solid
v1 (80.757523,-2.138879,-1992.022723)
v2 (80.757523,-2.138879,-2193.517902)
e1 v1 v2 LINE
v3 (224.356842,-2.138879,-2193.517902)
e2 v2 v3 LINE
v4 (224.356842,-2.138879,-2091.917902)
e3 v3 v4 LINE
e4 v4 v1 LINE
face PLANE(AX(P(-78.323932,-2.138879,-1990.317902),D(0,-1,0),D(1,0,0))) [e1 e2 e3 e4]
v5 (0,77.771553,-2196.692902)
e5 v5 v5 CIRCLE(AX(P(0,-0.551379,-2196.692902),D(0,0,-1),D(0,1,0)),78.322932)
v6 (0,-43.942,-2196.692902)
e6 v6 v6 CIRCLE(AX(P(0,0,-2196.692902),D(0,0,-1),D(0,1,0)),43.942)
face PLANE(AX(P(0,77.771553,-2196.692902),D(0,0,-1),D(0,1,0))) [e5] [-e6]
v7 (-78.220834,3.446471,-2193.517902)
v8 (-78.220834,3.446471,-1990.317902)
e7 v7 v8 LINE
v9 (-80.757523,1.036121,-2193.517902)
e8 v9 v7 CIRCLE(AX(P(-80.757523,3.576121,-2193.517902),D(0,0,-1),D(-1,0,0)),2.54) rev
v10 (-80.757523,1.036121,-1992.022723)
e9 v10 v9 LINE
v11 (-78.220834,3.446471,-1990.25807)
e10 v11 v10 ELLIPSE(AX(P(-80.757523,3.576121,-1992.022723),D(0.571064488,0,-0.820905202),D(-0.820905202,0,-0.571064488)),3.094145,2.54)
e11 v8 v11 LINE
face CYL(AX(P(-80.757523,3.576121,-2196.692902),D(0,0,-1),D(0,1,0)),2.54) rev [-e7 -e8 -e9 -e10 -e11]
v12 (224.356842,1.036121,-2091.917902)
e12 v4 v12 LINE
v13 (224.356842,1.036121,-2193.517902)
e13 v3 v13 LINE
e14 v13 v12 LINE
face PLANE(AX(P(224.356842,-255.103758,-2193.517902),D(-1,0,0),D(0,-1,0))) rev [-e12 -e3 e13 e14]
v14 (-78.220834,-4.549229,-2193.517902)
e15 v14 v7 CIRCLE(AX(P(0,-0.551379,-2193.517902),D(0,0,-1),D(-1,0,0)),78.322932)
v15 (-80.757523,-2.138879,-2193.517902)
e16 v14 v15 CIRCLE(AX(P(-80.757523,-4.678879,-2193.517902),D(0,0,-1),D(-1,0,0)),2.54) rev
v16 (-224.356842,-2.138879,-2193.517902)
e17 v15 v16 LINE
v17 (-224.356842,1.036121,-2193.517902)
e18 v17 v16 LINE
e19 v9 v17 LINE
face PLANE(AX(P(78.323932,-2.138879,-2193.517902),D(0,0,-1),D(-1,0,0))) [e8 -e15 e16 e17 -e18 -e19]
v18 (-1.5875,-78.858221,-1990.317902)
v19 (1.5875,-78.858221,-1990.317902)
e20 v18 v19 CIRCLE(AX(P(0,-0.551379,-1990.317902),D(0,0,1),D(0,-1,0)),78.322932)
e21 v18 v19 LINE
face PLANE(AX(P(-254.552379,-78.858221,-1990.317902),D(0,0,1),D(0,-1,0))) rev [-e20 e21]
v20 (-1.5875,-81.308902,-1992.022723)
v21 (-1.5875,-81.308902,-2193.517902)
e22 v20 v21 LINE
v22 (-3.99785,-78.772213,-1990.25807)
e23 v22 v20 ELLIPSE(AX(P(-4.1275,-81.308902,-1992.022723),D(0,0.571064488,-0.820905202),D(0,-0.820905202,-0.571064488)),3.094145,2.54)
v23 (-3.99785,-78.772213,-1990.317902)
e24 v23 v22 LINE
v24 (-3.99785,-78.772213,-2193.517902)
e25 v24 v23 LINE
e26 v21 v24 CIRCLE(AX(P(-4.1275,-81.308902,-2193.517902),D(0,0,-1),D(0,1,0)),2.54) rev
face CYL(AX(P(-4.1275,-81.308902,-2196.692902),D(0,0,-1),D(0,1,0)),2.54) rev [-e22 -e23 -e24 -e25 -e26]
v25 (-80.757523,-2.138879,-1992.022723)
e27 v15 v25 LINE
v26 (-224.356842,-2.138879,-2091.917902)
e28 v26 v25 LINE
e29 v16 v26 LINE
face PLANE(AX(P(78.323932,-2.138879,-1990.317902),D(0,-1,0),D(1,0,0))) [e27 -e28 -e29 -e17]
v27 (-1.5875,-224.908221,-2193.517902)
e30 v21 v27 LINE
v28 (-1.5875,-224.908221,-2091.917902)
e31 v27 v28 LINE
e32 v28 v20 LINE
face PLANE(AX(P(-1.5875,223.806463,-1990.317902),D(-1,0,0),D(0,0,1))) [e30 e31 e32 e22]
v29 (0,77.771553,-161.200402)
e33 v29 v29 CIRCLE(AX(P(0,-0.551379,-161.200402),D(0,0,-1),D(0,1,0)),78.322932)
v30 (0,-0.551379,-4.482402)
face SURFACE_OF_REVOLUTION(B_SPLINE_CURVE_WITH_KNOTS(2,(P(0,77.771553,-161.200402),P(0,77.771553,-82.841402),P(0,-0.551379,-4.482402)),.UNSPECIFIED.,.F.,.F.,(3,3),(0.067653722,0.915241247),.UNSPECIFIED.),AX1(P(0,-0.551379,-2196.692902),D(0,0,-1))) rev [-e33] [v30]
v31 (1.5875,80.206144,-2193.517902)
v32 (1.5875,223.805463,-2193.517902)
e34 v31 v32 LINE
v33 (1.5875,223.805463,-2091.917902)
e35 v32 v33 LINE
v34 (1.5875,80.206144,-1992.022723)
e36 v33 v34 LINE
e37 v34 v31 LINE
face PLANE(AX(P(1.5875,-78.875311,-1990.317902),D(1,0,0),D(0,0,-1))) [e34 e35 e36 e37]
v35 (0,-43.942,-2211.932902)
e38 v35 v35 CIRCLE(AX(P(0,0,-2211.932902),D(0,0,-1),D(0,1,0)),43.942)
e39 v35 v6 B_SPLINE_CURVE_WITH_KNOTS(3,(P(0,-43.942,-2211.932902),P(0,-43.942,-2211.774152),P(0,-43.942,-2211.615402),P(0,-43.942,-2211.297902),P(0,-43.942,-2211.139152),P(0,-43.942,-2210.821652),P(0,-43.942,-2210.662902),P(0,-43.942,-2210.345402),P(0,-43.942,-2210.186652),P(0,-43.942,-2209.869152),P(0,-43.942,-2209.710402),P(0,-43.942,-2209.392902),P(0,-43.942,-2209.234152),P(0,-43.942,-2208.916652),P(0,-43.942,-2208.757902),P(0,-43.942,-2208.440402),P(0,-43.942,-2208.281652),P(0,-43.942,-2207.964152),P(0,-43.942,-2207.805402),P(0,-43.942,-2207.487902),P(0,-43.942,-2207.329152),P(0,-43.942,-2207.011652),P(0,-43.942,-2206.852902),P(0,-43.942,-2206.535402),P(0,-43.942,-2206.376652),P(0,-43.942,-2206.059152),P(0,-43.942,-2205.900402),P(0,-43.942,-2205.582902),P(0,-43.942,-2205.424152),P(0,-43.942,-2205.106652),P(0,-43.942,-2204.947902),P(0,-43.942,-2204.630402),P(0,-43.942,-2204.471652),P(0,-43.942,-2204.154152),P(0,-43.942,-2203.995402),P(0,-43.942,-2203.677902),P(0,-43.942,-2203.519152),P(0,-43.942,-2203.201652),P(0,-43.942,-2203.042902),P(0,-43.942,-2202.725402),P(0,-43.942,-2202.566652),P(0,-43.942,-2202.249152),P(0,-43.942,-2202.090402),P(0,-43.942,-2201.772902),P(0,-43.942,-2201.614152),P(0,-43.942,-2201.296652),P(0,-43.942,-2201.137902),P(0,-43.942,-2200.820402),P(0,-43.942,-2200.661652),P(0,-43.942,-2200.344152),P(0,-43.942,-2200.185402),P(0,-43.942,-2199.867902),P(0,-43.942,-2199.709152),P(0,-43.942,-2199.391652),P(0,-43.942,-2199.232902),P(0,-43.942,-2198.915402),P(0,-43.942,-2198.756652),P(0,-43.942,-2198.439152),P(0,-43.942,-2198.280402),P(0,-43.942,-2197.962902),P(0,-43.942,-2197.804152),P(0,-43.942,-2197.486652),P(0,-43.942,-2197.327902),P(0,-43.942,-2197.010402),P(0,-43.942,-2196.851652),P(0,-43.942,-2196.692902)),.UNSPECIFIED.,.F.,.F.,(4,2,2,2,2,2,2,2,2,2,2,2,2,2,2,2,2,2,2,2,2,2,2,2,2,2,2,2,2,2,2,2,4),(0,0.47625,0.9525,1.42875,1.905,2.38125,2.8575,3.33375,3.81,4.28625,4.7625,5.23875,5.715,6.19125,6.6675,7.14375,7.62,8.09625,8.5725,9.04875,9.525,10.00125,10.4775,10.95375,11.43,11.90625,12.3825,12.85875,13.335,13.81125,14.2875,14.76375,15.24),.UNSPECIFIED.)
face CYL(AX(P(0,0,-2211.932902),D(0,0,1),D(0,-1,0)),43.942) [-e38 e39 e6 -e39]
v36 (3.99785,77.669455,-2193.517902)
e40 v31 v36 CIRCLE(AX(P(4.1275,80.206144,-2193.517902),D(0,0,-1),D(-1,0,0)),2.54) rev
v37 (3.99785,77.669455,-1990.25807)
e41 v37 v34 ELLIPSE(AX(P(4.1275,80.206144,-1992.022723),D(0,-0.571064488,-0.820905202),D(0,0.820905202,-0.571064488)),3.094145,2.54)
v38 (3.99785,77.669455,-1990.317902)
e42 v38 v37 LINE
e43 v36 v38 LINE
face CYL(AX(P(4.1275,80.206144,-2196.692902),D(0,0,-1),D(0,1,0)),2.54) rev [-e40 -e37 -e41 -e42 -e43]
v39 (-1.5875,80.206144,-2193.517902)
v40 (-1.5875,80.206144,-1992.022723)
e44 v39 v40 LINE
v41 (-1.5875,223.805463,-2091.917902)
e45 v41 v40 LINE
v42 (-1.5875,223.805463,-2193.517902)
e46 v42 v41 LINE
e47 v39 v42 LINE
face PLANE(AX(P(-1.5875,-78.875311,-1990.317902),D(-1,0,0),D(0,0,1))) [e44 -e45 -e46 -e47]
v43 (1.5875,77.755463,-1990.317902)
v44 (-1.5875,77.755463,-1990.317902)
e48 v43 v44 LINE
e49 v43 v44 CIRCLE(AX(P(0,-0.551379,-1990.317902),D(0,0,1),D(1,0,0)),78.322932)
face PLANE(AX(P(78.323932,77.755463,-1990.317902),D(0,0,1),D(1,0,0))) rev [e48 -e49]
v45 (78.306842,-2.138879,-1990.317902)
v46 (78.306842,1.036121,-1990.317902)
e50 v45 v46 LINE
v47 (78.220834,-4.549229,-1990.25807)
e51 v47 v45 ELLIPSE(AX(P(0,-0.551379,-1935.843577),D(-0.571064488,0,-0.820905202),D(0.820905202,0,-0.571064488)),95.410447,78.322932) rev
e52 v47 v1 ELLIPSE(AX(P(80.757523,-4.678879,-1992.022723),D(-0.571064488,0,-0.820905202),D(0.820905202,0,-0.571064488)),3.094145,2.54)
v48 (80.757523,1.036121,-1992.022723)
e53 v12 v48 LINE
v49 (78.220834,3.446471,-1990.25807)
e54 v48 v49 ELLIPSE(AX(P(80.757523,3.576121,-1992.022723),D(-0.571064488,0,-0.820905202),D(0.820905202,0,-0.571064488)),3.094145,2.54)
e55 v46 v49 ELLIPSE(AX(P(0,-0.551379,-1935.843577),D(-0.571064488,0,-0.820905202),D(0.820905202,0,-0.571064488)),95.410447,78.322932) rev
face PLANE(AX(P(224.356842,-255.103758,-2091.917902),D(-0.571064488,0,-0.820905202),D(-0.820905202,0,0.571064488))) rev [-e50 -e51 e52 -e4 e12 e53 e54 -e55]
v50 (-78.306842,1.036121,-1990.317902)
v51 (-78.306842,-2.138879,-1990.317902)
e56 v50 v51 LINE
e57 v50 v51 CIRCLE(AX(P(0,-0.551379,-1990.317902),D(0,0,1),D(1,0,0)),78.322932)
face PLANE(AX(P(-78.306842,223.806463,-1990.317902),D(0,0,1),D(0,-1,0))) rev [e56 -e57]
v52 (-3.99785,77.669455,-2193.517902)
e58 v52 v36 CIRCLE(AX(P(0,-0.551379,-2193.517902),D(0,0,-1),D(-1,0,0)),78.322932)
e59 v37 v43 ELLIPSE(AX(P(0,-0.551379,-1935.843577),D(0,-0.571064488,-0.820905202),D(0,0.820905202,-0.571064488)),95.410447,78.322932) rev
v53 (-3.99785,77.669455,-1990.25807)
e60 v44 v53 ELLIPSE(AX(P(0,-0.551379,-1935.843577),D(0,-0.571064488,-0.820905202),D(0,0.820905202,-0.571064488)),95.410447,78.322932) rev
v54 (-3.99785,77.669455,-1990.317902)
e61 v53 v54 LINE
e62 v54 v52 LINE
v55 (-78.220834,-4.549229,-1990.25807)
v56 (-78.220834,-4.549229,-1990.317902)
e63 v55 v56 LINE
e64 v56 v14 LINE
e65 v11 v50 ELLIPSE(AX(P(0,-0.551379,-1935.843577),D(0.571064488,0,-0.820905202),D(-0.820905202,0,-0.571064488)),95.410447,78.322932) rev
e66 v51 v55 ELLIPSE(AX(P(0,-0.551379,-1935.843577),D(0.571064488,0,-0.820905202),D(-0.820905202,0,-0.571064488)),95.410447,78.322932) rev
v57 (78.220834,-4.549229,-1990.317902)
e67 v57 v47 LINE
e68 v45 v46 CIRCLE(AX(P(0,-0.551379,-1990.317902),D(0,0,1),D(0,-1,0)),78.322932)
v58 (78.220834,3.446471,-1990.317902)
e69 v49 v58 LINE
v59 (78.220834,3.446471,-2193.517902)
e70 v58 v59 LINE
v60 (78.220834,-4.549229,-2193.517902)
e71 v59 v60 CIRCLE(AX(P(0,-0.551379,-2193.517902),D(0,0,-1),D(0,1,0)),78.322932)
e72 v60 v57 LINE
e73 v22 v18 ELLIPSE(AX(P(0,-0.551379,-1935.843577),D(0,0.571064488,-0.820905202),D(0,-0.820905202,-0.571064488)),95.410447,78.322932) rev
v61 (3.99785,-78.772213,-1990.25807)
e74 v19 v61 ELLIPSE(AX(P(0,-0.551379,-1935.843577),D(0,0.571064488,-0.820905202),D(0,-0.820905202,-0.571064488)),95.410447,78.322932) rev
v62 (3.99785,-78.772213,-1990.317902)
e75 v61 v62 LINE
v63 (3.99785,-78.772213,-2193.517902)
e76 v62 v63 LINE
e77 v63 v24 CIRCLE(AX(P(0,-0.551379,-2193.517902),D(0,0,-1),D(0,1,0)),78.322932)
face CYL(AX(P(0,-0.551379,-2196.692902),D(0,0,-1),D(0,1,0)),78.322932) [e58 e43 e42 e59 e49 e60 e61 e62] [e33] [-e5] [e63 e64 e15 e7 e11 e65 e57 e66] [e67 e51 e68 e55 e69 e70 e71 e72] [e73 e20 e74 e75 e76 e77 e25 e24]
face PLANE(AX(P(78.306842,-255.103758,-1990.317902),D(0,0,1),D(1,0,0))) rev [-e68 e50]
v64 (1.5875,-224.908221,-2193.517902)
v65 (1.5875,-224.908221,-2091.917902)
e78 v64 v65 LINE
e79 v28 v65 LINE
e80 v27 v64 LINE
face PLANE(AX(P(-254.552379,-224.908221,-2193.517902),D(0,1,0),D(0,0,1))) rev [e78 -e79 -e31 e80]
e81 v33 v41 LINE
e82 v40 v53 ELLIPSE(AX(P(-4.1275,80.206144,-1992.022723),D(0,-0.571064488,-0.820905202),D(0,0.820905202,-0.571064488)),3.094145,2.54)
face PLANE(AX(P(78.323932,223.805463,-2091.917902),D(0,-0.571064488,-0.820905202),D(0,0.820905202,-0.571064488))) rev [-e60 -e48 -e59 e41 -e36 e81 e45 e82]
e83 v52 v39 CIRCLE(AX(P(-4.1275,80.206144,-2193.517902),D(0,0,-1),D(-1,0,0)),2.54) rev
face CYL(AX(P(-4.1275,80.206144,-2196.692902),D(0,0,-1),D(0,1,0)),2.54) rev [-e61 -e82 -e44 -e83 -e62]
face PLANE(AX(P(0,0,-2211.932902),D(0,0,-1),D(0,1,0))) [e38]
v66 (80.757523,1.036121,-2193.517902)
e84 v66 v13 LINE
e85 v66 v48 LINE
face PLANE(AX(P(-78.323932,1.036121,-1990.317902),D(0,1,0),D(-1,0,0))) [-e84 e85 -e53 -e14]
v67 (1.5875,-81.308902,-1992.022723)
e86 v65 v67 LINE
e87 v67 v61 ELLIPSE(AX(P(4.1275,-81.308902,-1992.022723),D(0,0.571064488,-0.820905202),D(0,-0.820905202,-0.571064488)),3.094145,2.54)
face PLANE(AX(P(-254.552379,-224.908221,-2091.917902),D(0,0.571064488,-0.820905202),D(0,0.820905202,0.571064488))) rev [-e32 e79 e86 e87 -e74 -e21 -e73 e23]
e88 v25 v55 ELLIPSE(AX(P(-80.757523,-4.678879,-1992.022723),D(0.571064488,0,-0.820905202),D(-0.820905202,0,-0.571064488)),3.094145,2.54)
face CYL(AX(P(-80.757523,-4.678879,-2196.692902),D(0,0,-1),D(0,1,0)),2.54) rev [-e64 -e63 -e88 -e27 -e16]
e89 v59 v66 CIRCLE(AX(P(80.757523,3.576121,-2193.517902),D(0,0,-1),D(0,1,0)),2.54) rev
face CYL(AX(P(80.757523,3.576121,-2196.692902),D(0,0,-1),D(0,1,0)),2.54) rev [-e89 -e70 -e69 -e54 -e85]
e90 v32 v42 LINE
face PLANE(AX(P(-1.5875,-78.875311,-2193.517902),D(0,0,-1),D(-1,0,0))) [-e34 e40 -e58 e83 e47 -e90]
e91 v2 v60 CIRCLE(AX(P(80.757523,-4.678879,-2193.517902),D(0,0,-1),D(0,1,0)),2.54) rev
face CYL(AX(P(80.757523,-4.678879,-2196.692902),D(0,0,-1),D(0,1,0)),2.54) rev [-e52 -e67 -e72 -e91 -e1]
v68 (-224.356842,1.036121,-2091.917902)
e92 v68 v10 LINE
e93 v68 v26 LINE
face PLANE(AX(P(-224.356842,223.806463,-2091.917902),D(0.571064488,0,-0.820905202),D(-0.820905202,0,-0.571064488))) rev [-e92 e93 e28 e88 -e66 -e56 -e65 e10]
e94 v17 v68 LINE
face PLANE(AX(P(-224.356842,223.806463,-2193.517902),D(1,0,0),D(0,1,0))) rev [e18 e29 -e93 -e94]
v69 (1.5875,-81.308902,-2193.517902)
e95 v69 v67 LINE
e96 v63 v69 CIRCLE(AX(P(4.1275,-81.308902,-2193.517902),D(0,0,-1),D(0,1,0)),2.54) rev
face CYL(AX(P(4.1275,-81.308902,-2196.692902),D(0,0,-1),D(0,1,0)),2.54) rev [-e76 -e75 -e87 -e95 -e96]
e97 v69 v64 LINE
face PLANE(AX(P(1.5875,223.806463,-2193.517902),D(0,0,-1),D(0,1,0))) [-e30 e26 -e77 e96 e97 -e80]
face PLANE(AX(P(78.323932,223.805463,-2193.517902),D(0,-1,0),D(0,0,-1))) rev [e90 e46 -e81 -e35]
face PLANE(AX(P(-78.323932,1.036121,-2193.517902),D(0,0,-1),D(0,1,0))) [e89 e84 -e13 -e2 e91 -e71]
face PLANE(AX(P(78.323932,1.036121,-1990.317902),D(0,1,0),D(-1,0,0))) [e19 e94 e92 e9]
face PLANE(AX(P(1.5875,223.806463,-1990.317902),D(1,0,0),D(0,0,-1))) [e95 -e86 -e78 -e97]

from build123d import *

# Parameters (mm, degrees)
SKETCH3_R                = 43.942
BOSS_EXTRUDE1_DEPTH      = 15.24
BOSS_EXTRUDE2_REACH      = 2240.211
BOSS_EXTRUDE2_END_RADIUS = 78.322932
SKETCH4_W                = 3.175
SKETCH4_H                = 203.2
CUT_EXTRUDE1_REACH       = 2229.902
FILLET1_R                = 2.54
CIRPATTERN1_COUNT        = 4
FILLET1_OF_CIRPATTERN1_R = 2.54


with BuildPart() as part:
    # Sketch2 → Revolve1 (revolve)
    with BuildSketch(Plane(origin=(0, 0, 0), x_dir=(0, 0, -1), z_dir=(1, 0, 0))):
        with BuildLine():
            Line((161.200401562, 77.77155292), (2196.692901562, 77.77155292))
            Line((2196.692901562, 77.77155292), (2196.692901562, -0.55137908))
            Line((2196.692901562, -0.55137908), (4.482401562, -0.55137908))
            add(Edge.make_bspline(
                [(4.482401562, -0.55137908), (82.841401562, 77.77155292), (161.200401562, 77.77155292)],
                knots=[0.067653722, 0.067653722, 0.067653722, 0.915241247, 0.915241247, 0.915241247], degree=2))
        make_face()
    revolve(axis=Axis((0, -0.55137908, -2196.692901562), (0, 0, 1)))

    # Sketch3 → Boss-Extrude1 (add)
    with BuildSketch(Plane(origin=(0, 0, -2196.692901562), x_dir=(-1, 0, 0), z_dir=(0, 0, -1))):
        with Locations(Location((0, 0, 0), (0, 0, 270))):
            Circle(SKETCH3_R)
    extrude(amount=BOSS_EXTRUDE1_DEPTH)

    # Boss-Extrude2: up to this cylinder (the profile starts outside it)
    boss_extrude2_end = Plane(origin=(0, -0.55137908, -2091.917902), z_dir=(0, 0, -1)) * Cylinder(BOSS_EXTRUDE2_END_RADIUS, 4638.067864, mode=Mode.PRIVATE)
    # Sketch4 → Boss-Extrude2 (add, up to the surface)
    with BuildSketch(Plane(origin=(0, 254, 0), x_dir=(1, 0, 0), z_dir=(0, 1, 0)), mode=Mode.PRIVATE) as boss_extrude2_sk1:
        with Locations((0, 2091.917901562)):
            Rectangle(SKETCH4_W, SKETCH4_H)
    boss_extrude2_tool1 = extrude(boss_extrude2_sk1.sketch, amount=-BOSS_EXTRUDE2_REACH, mode=Mode.PRIVATE) - boss_extrude2_end
    boss_extrude2 = boss_extrude2_tool1.solids().sort_by_distance((0, 254, -2091.917902))[0]
    add(boss_extrude2)

    # Sketch5 → Cut-Extrude1 (cut, up to next)
    with BuildSketch(Plane.ZY.offset(1.5875), mode=Mode.PRIVATE) as cut_extrude1_sk1:
        Polygon((-2193.517901562, 223.805463028), (-2091.917901562, 223.805463028), (-1990.317901562, 77.755463028), (-1990.317901562, 254), (-2193.517901562, 254), align=None)
    cut_extrude1_tool1 = extrude(cut_extrude1_sk1.sketch, amount=-CUT_EXTRUDE1_REACH, mode=Mode.PRIVATE) & part.part
    cut_extrude1 = cut_extrude1_tool1.solids().sort_by_distance((-1.5875, 203.992033, -2054.843652))[0]
    add(cut_extrude1, mode=Mode.SUBTRACT)

    # Fillet1
    # the kernel refuses this fillet: 2.54 mm, written as the material it adds along each edge
    with BuildSketch(Plane(origin=(-1.5875, 77.755463028, -1984.191199419), x_dir=(-0.9993639751499004, -0.035660134220012574, 0), z_dir=(0, 0, -1))) as fillet1_piece_1_section:
        with BuildLine():
            CenterArc((2.450992889, 2.539698904), FILLET1_R, 182.043608468, 87.074170625)
            Line((-0.087391608, 2.449122163), (0, 0))
            ThreePointArc((0, 0), (1.205942189, 0.009284527), (2.411884379, 0))
        make_face()
    fillet1_piece_1 = extrude(amount=209.326702143, mode=Mode.PRIVATE)
    fillet1_piece_1 = split(fillet1_piece_1, bisect_by=Plane(origin=(-3.095055571, 77.697259455, -1990.27741212), z_dir=(0, -0.5710644881986003, -0.820905201785487)), keep=Keep.TOP, mode=Mode.PRIVATE)
    add(fillet1_piece_1)
    with BuildSketch(Plane(origin=(1.5875, 77.755463028, -1984.191199419), x_dir=(0.9993639751499004, -0.03566013422001344, 0), z_dir=(0, 0, -1))) as fillet1_piece_2_section:
        with BuildLine():
            CenterArc((2.450992889, -2.539698904), FILLET1_R, 90.882220907, 87.074170625)
            Line((-0.087391608, -2.449122163), (0, 0))
            ThreePointArc((0, 0), (1.205942189, -0.009284527), (2.411884379, 0))
        make_face()
    fillet1_piece_2 = extrude(amount=209.326702143, mode=Mode.PRIVATE)
    fillet1_piece_2 = split(fillet1_piece_2, bisect_by=Plane(origin=(3.095055571, 77.697259455, -1990.27741212), z_dir=(0, -0.5710644881986003, -0.820905201785487)), keep=Keep.TOP, mode=Mode.PRIVATE)
    add(fillet1_piece_2)

    # CirPattern1: Boss-Extrude2, Cut-Extrude1 ×4 about axis
    cirpattern1_axis = Axis((0, -0.55137908, 0), (0, 0, 1))
    add([boss_extrude2.rotate(cirpattern1_axis, i * 360 / CIRPATTERN1_COUNT) for i in range(1, CIRPATTERN1_COUNT)])
    add([cut_extrude1.rotate(cirpattern1_axis, i * 360 / CIRPATTERN1_COUNT) for i in range(1, CIRPATTERN1_COUNT)], mode=Mode.SUBTRACT)

    # Fillet1 of CirPattern1
    # the kernel refuses this fillet: 2.54 mm, written as the material it adds along each edge
    with BuildSketch(Plane(origin=(-78.306842107, -2.13887908, -1984.191199419), x_dir=(0.035660134220018555, -0.9993639751499002, 0), z_dir=(0, 0, -1))) as fillet1_of_cirpattern1_piece_1_section:
        with BuildLine():
            CenterArc((2.450992889, 2.539698904), FILLET1_OF_CIRPATTERN1_R, 182.043608468, 87.074170625)
            Line((-0.087391608, 2.449122163), (0, 0))
            ThreePointArc((0, 0), (1.205942189, 0.009284527), (2.411884379, 0))
        make_face()
    fillet1_of_cirpattern1_piece_1 = extrude(amount=209.326702143, mode=Mode.PRIVATE)
    fillet1_of_cirpattern1_piece_1 = split(fillet1_of_cirpattern1_piece_1, bisect_by=Plane(origin=(-78.248638535, -3.646434651, -1990.27741212), z_dir=(0.5710644881986003, 0, -0.820905201785487)), keep=Keep.TOP, mode=Mode.PRIVATE)
    add(fillet1_of_cirpattern1_piece_1)
    with BuildSketch(Plane(origin=(-78.306842107, 1.03612092, -1984.191199419), x_dir=(0.03566013422001241, 0.9993639751499004, 0), z_dir=(0, 0, -1))) as fillet1_of_cirpattern1_piece_2_section:
        with BuildLine():
            CenterArc((2.450992889, -2.539698904), FILLET1_OF_CIRPATTERN1_R, 90.882220907, 87.074170625)
            Line((-0.087391608, -2.449122163), (0, 0))
            ThreePointArc((0, 0), (1.205942189, -0.009284527), (2.411884379, 0))
        make_face()
    fillet1_of_cirpattern1_piece_2 = extrude(amount=209.326702143, mode=Mode.PRIVATE)
    fillet1_of_cirpattern1_piece_2 = split(fillet1_of_cirpattern1_piece_2, bisect_by=Plane(origin=(-78.248638535, 2.543676491, -1990.27741212), z_dir=(0.5710644881986003, 0, -0.820905201785487)), keep=Keep.TOP, mode=Mode.PRIVATE)
    add(fillet1_of_cirpattern1_piece_2)
    with BuildSketch(Plane(origin=(1.5875, -78.858221187, -1984.191199419), x_dir=(0.9993639751499, 0.035660134220024196, 0), z_dir=(0, 0, -1))) as fillet1_of_cirpattern1_piece_3_section:
        with BuildLine():
            CenterArc((2.450992889, 2.539698904), FILLET1_OF_CIRPATTERN1_R, 182.043608468, 87.074170625)
            Line((-0.087391608, 2.449122163), (0, 0))
            ThreePointArc((0, 0), (1.205942189, 0.009284527), (2.411884379, 0))
        make_face()
    fillet1_of_cirpattern1_piece_3 = extrude(amount=209.326702143, mode=Mode.PRIVATE)
    fillet1_of_cirpattern1_piece_3 = split(fillet1_of_cirpattern1_piece_3, bisect_by=Plane(origin=(3.095055571, -78.800017614, -1990.27741212), z_dir=(0, 0.5710644881986003, -0.820905201785487)), keep=Keep.TOP, mode=Mode.PRIVATE)
    add(fillet1_of_cirpattern1_piece_3)
    with BuildSketch(Plane(origin=(-1.5875, -78.858221187, -1984.191199419), x_dir=(-0.9993639751499004, 0.03566013422001241, 0), z_dir=(0, 0, -1))) as fillet1_of_cirpattern1_piece_4_section:
        with BuildLine():
            CenterArc((2.450992889, -2.539698904), FILLET1_OF_CIRPATTERN1_R, 90.882220907, 87.074170625)
            Line((-0.087391608, -2.449122163), (0, 0))
            ThreePointArc((0, 0), (1.205942189, -0.009284527), (2.411884379, 0))
        make_face()
    fillet1_of_cirpattern1_piece_4 = extrude(amount=209.326702143, mode=Mode.PRIVATE)
    fillet1_of_cirpattern1_piece_4 = split(fillet1_of_cirpattern1_piece_4, bisect_by=Plane(origin=(-3.095055571, -78.800017614, -1990.27741212), z_dir=(0, 0.5710644881986003, -0.820905201785487)), keep=Keep.TOP, mode=Mode.PRIVATE)
    add(fillet1_of_cirpattern1_piece_4)
    with BuildSketch(Plane(origin=(78.306842107, 1.03612092, -1984.191199419), x_dir=(-0.03566013422001241, 0.9993639751499004, 0), z_dir=(0, 0, -1))) as fillet1_of_cirpattern1_piece_5_section:
        with BuildLine():
            CenterArc((2.450992889, 2.539698904), FILLET1_OF_CIRPATTERN1_R, 182.043608468, 87.074170625)
            Line((-0.087391608, 2.449122163), (0, 0))
            ThreePointArc((0, 0), (1.205942189, 0.009284527), (2.411884379, 0))
        make_face()
    fillet1_of_cirpattern1_piece_5 = extrude(amount=209.326702143, mode=Mode.PRIVATE)
    fillet1_of_cirpattern1_piece_5 = split(fillet1_of_cirpattern1_piece_5, bisect_by=Plane(origin=(78.248638535, 2.543676491, -1990.27741212), z_dir=(-0.5710644881986003, 0, -0.820905201785487)), keep=Keep.TOP, mode=Mode.PRIVATE)
    add(fillet1_of_cirpattern1_piece_5)
    with BuildSketch(Plane(origin=(78.306842107, -2.13887908, -1984.191199419), x_dir=(-0.03566013422001242, -0.9993639751499004, 0), z_dir=(0, 0, -1))) as fillet1_of_cirpattern1_piece_6_section:
        with BuildLine():
            CenterArc((2.450992889, -2.539698904), FILLET1_OF_CIRPATTERN1_R, 90.882220907, 87.074170625)
            Line((-0.087391608, -2.449122163), (0, 0))
            ThreePointArc((0, 0), (1.205942189, -0.009284527), (2.411884379, 0))
        make_face()
    fillet1_of_cirpattern1_piece_6 = extrude(amount=209.326702143, mode=Mode.PRIVATE)
    fillet1_of_cirpattern1_piece_6 = split(fillet1_of_cirpattern1_piece_6, bisect_by=Plane(origin=(78.248638535, -3.646434651, -1990.27741212), z_dir=(-0.5710644881986003, 0, -0.820905201785487)), keep=Keep.TOP, mode=Mode.PRIVATE)
    add(fillet1_of_cirpattern1_piece_6)


solid = part.part
